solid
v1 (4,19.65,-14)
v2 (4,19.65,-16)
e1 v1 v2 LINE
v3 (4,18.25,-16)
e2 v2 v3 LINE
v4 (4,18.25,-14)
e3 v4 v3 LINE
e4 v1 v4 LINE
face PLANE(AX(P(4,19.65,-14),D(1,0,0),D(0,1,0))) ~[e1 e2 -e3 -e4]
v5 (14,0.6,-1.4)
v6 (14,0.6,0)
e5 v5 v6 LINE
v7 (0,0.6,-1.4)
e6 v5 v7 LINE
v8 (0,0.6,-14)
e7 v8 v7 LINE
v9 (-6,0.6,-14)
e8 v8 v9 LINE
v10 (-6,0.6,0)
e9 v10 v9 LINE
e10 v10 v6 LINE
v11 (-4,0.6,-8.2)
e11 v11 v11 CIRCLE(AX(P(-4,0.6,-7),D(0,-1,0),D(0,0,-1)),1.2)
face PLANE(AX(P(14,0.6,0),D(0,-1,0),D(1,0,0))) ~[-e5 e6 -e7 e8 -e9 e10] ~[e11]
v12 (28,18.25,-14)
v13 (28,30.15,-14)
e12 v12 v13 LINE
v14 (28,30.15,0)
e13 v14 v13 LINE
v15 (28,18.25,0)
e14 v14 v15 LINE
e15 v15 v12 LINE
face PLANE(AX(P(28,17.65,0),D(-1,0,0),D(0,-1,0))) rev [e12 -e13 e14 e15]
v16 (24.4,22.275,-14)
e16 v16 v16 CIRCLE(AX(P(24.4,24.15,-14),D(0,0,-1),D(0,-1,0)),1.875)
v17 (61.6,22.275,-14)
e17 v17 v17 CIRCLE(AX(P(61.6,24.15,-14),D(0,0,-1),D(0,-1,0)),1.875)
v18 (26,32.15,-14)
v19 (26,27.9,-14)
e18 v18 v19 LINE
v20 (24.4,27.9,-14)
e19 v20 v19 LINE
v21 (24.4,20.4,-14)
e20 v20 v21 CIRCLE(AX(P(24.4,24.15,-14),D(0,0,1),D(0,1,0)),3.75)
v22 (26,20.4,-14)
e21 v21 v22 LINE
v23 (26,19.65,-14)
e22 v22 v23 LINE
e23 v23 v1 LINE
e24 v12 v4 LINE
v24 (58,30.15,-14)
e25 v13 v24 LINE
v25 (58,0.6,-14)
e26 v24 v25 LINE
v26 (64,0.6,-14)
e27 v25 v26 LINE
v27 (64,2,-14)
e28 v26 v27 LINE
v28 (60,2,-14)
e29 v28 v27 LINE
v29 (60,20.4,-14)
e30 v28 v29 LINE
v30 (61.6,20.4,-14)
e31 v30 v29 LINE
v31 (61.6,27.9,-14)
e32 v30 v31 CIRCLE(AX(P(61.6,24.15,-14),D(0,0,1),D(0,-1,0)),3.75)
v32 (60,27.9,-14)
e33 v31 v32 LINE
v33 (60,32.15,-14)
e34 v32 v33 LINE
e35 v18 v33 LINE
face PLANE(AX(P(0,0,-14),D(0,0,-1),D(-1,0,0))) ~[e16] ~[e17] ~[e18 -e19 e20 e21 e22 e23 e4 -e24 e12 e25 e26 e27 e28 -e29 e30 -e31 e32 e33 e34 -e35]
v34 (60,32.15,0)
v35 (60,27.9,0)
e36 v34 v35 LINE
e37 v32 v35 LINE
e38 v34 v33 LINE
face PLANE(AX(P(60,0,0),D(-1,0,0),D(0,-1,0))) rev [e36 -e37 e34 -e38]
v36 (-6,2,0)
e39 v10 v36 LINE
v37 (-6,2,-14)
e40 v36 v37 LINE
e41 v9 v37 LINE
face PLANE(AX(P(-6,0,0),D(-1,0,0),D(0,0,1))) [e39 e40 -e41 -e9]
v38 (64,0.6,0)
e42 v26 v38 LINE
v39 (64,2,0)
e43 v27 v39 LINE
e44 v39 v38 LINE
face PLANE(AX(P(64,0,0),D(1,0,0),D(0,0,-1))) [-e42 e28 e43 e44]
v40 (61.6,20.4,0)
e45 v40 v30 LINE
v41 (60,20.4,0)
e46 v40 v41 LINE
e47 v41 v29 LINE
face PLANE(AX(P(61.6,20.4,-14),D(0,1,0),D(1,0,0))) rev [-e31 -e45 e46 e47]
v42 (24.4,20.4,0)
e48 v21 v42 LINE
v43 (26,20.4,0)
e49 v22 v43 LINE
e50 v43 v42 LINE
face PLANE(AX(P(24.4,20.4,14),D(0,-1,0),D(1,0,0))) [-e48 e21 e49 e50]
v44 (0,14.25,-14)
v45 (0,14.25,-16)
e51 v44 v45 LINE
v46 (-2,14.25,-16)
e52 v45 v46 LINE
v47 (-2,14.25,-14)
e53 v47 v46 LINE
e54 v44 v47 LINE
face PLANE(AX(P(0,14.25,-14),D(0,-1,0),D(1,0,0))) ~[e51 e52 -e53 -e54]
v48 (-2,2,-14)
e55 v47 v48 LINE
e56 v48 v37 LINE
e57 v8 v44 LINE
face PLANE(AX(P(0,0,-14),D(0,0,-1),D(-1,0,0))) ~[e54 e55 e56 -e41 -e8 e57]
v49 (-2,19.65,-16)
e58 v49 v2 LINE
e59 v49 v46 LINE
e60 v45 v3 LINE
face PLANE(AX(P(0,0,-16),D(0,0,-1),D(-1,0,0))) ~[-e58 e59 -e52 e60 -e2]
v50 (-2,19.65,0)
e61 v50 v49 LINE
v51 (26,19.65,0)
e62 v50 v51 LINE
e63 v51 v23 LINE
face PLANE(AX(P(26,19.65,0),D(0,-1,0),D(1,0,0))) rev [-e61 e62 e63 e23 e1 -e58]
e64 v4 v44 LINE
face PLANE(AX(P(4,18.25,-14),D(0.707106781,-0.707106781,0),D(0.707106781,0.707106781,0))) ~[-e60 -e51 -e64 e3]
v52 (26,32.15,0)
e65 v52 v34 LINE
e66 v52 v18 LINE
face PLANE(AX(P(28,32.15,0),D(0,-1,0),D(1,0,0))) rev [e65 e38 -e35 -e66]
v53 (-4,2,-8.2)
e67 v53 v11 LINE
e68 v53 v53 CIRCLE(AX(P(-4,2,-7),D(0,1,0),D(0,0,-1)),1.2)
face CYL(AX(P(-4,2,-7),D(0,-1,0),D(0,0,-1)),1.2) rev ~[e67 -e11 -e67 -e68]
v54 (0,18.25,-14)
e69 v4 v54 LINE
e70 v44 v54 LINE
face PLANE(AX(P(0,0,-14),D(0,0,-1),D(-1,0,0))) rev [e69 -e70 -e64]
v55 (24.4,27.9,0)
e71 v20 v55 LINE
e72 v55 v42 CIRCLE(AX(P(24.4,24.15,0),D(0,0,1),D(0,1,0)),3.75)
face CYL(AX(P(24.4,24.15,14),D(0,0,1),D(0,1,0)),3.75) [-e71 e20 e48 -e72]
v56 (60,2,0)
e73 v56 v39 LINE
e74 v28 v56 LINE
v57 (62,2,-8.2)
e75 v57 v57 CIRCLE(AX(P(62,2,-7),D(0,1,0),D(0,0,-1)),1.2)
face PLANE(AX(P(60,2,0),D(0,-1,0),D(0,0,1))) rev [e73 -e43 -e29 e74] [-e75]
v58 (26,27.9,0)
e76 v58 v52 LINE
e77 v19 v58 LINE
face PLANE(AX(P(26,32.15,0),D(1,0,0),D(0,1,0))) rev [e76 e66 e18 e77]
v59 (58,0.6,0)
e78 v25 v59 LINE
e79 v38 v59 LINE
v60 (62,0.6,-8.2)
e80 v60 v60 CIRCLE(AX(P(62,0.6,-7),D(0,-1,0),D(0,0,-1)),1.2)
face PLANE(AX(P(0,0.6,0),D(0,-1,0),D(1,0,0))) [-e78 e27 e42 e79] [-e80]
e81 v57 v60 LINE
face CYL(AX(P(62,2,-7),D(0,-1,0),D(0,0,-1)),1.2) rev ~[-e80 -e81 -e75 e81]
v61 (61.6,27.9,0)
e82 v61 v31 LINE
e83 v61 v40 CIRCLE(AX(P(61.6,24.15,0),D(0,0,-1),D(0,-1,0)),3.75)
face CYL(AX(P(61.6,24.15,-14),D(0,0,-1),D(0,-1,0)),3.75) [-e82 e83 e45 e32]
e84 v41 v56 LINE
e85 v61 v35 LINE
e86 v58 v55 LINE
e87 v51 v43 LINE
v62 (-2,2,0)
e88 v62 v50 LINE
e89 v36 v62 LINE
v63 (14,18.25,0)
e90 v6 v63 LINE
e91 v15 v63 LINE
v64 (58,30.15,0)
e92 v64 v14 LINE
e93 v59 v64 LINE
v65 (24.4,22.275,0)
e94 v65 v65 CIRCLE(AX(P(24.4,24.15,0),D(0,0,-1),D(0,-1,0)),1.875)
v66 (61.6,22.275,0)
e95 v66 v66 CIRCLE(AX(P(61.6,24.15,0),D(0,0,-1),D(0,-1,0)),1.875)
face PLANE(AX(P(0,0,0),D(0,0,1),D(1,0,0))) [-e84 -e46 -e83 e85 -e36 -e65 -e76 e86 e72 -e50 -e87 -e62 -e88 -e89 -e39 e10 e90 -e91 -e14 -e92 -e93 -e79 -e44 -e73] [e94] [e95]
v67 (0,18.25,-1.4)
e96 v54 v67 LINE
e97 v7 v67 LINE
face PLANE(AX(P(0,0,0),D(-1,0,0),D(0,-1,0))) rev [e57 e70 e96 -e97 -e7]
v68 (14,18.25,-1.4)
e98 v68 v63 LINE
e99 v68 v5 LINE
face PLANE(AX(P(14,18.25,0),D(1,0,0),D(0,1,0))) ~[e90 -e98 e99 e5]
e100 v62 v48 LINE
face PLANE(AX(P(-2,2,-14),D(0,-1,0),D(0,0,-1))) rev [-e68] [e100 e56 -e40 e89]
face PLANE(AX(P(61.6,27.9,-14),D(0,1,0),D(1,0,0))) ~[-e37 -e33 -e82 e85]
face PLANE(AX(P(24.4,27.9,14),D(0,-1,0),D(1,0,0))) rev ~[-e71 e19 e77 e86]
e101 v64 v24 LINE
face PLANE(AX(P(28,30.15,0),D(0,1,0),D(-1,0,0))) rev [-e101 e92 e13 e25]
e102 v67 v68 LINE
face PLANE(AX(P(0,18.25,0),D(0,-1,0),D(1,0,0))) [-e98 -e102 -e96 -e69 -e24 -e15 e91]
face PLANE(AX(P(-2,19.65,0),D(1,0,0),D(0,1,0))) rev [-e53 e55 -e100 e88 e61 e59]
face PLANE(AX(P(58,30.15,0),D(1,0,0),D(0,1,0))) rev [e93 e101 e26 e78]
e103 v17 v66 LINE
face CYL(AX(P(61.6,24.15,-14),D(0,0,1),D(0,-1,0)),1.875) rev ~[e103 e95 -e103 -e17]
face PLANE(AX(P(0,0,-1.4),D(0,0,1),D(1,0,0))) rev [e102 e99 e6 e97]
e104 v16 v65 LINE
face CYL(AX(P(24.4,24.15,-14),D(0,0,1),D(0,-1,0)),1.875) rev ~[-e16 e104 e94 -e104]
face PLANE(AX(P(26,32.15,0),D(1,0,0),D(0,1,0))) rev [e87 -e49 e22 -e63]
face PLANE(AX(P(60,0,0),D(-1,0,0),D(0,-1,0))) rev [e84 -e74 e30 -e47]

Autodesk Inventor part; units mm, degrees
ref_plane "YZ Plane" through (0, 0, 0) normal (1, 0, 0) x (0, 1, 0)
ref_plane "XZ Plane" through (0, 0, 0) normal (0, 1, 0) x (-1, 0, 0)
ref_plane "XY Plane" through (0, 0, 0) normal (0, 0, 1) x (1, 0, 0)
sketch "スケッチ1" plane through (0, 0, 0) normal (0, 0, 1) x (1, 0, 0)
  line L0 (0, 0) -> (0, 17.65)
  line L1 (0, 17.65) -> (28, 17.65)
  line L2 (28, 17.65) -> (28, 30.15)
  line L3 (28, 30.15) -> (58, 30.15)
  line L4 (58, 30.15) -> (58, 0)
  line L5 (58, 0) -> (60, 0)
  line L6 (60, 0) -> (60, 32.15)
  line L7 (60, 32.15) -> (28, 32.15)
  line L8 (28, 32.15) -> (26, 32.15)
  line L9 (26, 32.15) -> (26, 19.65)
  line L10 (26, 19.65) -> (-2, 19.65)
  line L11 (-2, 19.65) -> (-2, 0)
  line L12 (-2, 0) -> (0, 0)
  dimension "d0" = 17.65
  dimension "d1" = 28
  dimension "d2" = 12.5
  dimension "d3" = 30
  dimension "d4" = 2
  dimension "d5" = 32.15
  dimension "d6" = 32
  dimension "d7" = 2
  dimension "d8" = 12.5
  dimension "d9" = 28
extrude "押し出し1" add sketch "スケッチ1" along normal blind 14
sketch "スケッチ2" plane through (60, 0, 0) normal (1, 0, 0) x (0, 0, -1)
  line L0 (0, 0) -> (-14, 0) projected
  line L1 (-14, 0) -> (0, 0)
  line L2 (0, 0) -> (0, 2)
  line L3 (0, 2) -> (-14, 2)
  line L4 (-14, 2) -> (-14, 0)
  dimension "d12" = 14
  dimension "d13" = 2
extrude "押し出し2" add sketch "スケッチ2" along normal blind 7
sketch "スケッチ3" plane through (-2, 0, 0) normal (-1, 0, 0) x (0, 0, 1)
  line L0 (14, 2) -> (0, 2) projected
  line L1 (0, 0) -> (14, 0)
  line L2 (14, 0) -> (14, 2)
  line L3 (14, 2) -> (0, 2)
  line L4 (0, 2) -> (0, 0)
  dimension "d16" = 14
extrude "押し出し3" add sketch "スケッチ3" along normal blind 7
sketch "スケッチ4" plane through (0, 0, 14) normal (0, 0, 1) x (1, 0, 0)
  line L0 (60, 32.15) -> (60, 24.15)
  line L1 (60, 24.15) -> (61.6, 24.15)
  arc A0 (61.6, 20.4) -> (61.6, 27.9) centre (61.6, 24.15) ccw
  line L2 (61.6, 24.15) -> (61.6, 20.4) construction
  line L3 (61.6, 24.15) -> (61.6, 27.9) construction
  line L4 (61.6, 27.9) -> (60, 27.9)
  line L5 (61.6, 20.4) -> (60, 20.4)
  line L6 (60, 2) -> (60, 32.15) projected
  line L7 (60, 27.9) -> (60, 20.4)
  point P0 (0, 0)
  dimension "d47" = 8
  dimension "d48" = 1.6
  dimension "d49" = 3.75
  dimension "d50" = 180
extrude "押し出し4" add sketch "スケッチ4" against normal blind 14
hole "穴3" at (61.6, 24.15, 14) direction (0, 0, -1) diameter 3.75 end through all
sketch "スケッチ7" plane through (0, 0, 14) normal (0, 0, 1) x (1, 0, 0)
  line L0 (60, 32.15) -> (26, 32.15) projected
  line L1 (26, 32.15) -> (26, 24.15)
  line L2 (26, 24.15) -> (24.4, 24.15)
  arc A0 (24.4, 27.9) -> (24.4, 20.4) centre (24.4, 24.15) ccw
  line L3 (24.4, 27.9) -> (26, 27.9)
  line L4 (24.4, 20.4) -> (26, 20.4)
  line L5 (26, 20.4) -> (26, 27.9)
  line L6 (26, 32.15) -> (26, 19.65) projected
  circle A1 centre (24.4, 24.15) radius 1.875
  point P0 (0, 0)
  dimension "d60" = 8
  dimension "d61" = 1.6
  dimension "d62" = 3.75
  dimension "d63" = 3.75
extrude "押し出し6" add sketch "スケッチ7" against normal blind 14 contours L1 A1 L5 L4 A0 L3 | L1 L5 A1 picked at (23.6929, 24.15)
hole "穴4" at (24.4, 24.15, 14) direction (0, 0, -1) diameter 3.75 end through all
sketch "スケッチ10" plane through (0, 17.65, 0) normal (0, -1, 0) x (1, 0, 0)
  line L0 (28, 14) -> (58, 14) projected
  line L1 (0, 0) -> (28, 0)
  line L2 (28, 0) -> (28, 14)
  line L3 (28, 14) -> (0, 14)
  line L4 (0, 14) -> (0, 0)
extrude "押し出し7" cut sketch "スケッチ10" against normal blind 0.6
sketch "スケッチ11" plane through (0, 0, 0) normal (0, -1, 0) x (1, 0, 0)
  line L0 (0, 14) -> (-9, 14) projected
  line L1 (60, 0) -> (67, 0) projected
  line L2 (-9, 14) -> (67, 14)
  line L3 (67, 14) -> (67, 0)
  line L4 (67, 0) -> (-9, 0)
  line L5 (-9, 0) -> (-9, 14)
  point P0 (0, 0)
extrude "押し出し8" cut sketch "スケッチ11" against normal blind 0.6
sketch "スケッチ12" plane through (0, 0, 14) normal (0, 0, 1) x (1, 0, 0)
  line L0 (-2, 19.65) -> (-2, 2) projected
  line L1 (-2, 19.65) -> (4, 19.65)
  line L2 (26, 19.65) -> (-2, 19.65) projected
  line L3 (4, 19.65) -> (4, 18.25)
  line L4 (0, 18.25) -> (28, 18.25) projected
  line L5 (4, 18.25) -> (0.2844, 14.5344)
  line L6 (4, 18.25) -> (9.2547, 18.25) construction
  line L7 (0.2844, 14.5344) -> (0, 14.25)
  line L8 (0, 0.6) -> (0, 18.25) projected
  line L9 (0, 14.25) -> (-2, 14.25)
  line L10 (-2, 14.25) -> (-2, 19.65)
  point P0 (0, 0)
  dimension "d79" = 6
  dimension "d80" = 135
extrude "押し出し9" add sketch "スケッチ12" along normal blind 2
sketch "スケッチ15" plane through (0, 0, 0) normal (0, 0, -1) x (-1, 0, 0)
  line L0 (0, 0.6) -> (0, 18.25) projected
  line L1 (0, 18.25) -> (-14, 18.25)
  line L2 (-14, 18.25) -> (-14, 0.6)
  line L3 (-14, 0.6) -> (0, 0.6)
  line L4 (0, 0.6) -> (0, 18.25)
  point P0 (0, 0)
  dimension "d88" = 14
extrude "押し出し11" add sketch "スケッチ15" against normal blind 1.4
sketch "スケッチ17" plane through (67, 0, 0) normal (1, 0, 0) x (0, 0, -1)
  line L0 (0, 0.6) -> (-14, 0.6) projected
  line L1 (0, 0.6) -> (-14, 0.6)
  line L2 (-14, 0.6) -> (-14, 9.5309)
  line L3 (-14, 9.5309) -> (0, 9.5309)
  line L4 (0, 9.5309) -> (0, 0.6)
  point P0 (0, 0)
extrude "押し出し13" cut sketch "スケッチ17" against normal blind 3
sketch "スケッチ18" plane through (-9, 0, 0) normal (-1, 0, 0) x (0, 0, 1)
  line L0 (0, 0.6) -> (14, 0.6) projected
  line L1 (0, 0.6) -> (14, 0.6)
  line L2 (14, 0.6) -> (14, 6.5)
  line L3 (14, 6.5) -> (0, 6.5)
  line L4 (0, 6.5) -> (0, 0.6)
  point P0 (0, 0)
extrude "押し出し14" cut sketch "スケッチ18" against normal blind 3
hole "穴5" at (-4, 2, 7) direction (0, -1, 0) diameter 2.4 end through all
hole "穴6" at (62, 2, 7) direction (0, -1, 0) diameter 2.4 end through all
mirror "ミラー1" about plane through (31.8158, 20.0509, 0) normal (0, 0, -1) of "押し出し3", "押し出し1", "押し出し4", "穴3", "押し出し2", "穴6", "穴4", "押し出し6", "押し出し7", "押し出し9", "押し出し11", "押し出し14", "押し出し13", "穴5", "押し出し8"
sketch "スケッチ19" plane through (0, 0, 14) normal (0, 0, 1) x (1, 0, 0)
  line L0 (94.8832, 81.412) -> (-62.365, 81.412)
  line L1 (-62.365, 81.412) -> (-62.365, -71.7744)
  line L2 (-62.365, -71.7744) -> (94.8832, -71.7744)
  line L3 (94.8832, -71.7744) -> (94.8832, 81.412)
  point P0 (0, 0)
extrude "押し出し15" cut sketch "スケッチ19" against normal blind 14
sketch "スケッチ20" plane through (-2, 19.65, 14) normal (0, 1, 0) x (1, 0, 0)
  line L0 (17.6833, -4.2941) -> (-12.6138, -4.2941)
  line L1 (-12.6138, -4.2941) -> (-12.6138, 1.0873)
  line L2 (-12.6138, 1.0873) -> (17.6833, 1.0873)
  line L3 (17.6833, 1.0873) -> (17.6833, -4.2941)
  point P0 (2, 14)
extrude "押し出し16" cut sketch "スケッチ20" against normal blind 14
properties part number "センサ冶具2個積み右"
